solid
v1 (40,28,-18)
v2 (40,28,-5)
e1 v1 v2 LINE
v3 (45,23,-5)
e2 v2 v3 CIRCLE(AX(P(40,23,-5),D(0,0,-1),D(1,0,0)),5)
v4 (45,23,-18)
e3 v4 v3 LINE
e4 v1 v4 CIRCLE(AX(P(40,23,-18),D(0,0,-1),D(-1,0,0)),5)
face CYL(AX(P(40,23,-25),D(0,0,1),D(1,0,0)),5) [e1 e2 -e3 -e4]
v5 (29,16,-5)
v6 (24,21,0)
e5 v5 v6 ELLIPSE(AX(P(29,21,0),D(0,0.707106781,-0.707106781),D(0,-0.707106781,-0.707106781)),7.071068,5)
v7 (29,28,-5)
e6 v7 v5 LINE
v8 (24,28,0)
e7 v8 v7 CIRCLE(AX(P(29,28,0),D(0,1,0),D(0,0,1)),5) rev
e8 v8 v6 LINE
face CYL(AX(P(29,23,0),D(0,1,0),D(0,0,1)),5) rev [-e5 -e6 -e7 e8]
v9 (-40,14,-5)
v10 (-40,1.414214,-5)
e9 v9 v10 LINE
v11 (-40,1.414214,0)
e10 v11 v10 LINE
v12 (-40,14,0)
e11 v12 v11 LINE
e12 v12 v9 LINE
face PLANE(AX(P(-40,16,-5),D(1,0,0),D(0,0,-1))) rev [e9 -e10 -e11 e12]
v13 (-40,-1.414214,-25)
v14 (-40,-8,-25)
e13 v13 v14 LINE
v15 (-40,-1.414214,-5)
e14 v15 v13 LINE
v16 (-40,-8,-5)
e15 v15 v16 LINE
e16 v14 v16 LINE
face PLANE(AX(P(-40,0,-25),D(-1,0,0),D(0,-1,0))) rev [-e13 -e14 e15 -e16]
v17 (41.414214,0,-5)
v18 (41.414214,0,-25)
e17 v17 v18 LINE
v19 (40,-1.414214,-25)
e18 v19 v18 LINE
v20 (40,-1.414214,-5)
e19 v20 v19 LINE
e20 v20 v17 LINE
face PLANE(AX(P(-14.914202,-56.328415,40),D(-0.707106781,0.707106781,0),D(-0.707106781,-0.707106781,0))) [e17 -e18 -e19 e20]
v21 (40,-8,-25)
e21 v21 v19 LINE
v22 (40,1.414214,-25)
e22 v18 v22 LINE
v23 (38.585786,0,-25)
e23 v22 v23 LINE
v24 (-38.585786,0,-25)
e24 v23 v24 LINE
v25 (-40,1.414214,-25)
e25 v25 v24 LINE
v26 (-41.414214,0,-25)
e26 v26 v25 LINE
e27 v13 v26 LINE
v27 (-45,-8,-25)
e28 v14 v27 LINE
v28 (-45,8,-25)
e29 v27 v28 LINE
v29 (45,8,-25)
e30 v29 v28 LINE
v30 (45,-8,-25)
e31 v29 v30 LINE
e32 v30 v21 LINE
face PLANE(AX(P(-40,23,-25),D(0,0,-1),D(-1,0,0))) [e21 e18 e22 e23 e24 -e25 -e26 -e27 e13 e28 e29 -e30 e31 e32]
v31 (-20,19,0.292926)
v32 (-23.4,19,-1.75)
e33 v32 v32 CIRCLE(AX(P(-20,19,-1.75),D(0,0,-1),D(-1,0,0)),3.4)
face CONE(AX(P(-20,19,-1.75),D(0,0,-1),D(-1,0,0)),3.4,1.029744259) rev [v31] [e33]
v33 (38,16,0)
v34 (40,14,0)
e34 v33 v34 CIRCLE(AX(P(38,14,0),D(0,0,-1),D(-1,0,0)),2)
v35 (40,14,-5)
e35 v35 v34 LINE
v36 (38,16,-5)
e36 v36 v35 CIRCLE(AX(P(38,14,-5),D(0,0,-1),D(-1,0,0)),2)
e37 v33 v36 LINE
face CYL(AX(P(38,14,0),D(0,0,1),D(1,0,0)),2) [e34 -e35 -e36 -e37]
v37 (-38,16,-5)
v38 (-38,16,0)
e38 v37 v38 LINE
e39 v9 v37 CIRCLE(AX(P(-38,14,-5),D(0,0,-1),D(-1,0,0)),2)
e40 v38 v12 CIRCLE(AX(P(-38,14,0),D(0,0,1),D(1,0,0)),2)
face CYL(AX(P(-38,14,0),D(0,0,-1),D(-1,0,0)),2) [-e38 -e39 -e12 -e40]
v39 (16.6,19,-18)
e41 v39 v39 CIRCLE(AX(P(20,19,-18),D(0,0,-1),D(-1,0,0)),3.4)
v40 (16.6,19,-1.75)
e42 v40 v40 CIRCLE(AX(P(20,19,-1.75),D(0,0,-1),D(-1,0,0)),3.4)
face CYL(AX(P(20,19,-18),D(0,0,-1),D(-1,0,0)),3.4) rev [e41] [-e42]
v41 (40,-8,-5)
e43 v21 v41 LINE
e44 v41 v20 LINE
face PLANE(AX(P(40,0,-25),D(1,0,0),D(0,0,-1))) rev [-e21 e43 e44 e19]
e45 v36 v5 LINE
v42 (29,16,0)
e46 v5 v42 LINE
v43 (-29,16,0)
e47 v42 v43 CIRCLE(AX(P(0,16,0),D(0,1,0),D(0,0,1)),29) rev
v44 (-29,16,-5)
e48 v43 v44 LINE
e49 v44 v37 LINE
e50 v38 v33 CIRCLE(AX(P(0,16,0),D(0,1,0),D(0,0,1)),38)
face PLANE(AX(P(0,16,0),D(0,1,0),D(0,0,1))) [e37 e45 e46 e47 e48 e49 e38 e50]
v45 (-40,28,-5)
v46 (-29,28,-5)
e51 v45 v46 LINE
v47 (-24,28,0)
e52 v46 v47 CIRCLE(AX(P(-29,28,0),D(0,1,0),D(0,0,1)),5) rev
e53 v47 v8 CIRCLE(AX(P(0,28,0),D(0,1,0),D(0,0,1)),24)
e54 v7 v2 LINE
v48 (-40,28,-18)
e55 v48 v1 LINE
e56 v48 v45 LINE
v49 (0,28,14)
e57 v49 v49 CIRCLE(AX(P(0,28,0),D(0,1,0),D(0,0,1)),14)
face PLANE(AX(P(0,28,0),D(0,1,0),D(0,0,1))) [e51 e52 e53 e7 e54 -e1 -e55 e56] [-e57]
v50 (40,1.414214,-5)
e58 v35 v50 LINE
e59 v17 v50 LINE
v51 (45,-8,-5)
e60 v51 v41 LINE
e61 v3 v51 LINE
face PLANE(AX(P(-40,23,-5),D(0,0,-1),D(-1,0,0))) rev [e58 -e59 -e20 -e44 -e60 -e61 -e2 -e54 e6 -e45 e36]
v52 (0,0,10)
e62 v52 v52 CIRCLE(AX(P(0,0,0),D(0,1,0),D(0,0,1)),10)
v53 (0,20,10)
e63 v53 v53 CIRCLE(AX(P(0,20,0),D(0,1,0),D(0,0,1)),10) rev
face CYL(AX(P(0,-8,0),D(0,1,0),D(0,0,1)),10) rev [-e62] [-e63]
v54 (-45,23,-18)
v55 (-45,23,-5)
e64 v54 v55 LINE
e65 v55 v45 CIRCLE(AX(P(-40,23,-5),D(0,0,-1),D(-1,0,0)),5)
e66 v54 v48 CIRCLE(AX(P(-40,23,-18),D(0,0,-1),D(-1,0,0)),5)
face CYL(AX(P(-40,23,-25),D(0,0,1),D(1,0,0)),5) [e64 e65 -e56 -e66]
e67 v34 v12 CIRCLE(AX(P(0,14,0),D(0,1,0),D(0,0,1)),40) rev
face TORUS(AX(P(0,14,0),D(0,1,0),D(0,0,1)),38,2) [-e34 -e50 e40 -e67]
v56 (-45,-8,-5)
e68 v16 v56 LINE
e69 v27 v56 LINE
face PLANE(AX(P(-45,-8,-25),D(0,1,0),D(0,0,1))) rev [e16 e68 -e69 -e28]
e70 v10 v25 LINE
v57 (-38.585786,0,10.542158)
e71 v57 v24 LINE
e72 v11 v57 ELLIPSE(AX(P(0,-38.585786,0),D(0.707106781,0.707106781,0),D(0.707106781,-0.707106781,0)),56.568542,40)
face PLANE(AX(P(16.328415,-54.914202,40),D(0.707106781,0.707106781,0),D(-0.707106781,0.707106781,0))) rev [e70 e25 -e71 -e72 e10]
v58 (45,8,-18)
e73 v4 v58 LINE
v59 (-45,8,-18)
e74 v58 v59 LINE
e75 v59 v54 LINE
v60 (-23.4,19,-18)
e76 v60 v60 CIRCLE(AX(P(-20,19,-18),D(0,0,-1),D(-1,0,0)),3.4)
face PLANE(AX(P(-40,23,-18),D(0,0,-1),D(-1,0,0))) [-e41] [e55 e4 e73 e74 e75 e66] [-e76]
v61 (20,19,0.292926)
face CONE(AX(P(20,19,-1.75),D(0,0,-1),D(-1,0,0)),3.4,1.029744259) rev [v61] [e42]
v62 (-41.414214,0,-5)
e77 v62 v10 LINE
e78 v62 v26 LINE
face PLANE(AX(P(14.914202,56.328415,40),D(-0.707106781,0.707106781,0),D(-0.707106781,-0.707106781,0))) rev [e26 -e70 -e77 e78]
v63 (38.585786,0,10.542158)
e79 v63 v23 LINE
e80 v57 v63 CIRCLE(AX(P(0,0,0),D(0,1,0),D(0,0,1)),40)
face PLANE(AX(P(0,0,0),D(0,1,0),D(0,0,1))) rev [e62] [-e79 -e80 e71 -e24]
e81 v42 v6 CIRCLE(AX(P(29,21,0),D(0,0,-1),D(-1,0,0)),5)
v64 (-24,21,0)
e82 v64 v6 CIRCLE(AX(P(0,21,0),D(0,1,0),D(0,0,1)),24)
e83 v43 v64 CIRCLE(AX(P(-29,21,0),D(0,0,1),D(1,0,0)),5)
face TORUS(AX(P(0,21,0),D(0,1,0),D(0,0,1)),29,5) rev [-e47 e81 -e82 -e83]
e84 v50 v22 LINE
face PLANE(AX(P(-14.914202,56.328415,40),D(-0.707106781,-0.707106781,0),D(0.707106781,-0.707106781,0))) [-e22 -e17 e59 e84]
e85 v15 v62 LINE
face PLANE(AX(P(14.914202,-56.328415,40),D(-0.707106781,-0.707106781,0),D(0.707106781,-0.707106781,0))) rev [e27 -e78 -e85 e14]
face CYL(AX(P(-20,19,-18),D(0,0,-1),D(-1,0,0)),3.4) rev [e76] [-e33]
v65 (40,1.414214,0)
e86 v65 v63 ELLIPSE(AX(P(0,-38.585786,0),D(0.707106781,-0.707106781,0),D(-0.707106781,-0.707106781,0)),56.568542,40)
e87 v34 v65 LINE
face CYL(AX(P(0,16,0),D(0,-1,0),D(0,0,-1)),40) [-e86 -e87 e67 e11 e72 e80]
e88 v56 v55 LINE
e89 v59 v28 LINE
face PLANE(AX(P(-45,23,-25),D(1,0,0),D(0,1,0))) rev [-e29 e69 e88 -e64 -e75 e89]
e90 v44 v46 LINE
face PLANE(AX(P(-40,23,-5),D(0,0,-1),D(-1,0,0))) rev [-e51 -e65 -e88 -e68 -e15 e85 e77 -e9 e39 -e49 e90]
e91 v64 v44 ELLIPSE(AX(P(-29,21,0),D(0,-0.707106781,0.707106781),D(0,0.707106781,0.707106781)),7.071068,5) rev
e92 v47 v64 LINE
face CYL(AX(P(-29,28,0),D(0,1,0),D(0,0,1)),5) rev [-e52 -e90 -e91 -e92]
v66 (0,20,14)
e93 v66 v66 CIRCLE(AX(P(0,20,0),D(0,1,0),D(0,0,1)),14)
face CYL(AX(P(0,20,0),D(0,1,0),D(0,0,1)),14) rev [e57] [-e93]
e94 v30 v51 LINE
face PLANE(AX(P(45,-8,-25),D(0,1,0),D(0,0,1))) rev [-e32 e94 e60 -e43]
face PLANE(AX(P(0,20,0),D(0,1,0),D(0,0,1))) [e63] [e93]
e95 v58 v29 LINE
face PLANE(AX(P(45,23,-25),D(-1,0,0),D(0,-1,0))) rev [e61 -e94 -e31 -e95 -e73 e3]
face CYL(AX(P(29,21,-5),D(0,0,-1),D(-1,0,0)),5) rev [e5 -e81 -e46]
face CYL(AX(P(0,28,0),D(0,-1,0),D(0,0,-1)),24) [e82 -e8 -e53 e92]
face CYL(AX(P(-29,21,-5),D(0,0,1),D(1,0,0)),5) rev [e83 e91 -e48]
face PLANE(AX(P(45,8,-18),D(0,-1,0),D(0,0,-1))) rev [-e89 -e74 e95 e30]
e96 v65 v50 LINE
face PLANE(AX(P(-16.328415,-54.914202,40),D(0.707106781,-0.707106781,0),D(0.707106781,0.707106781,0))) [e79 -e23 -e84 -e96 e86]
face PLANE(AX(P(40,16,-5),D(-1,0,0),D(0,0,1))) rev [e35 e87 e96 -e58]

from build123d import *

# Parameters (mm, degrees)
EXTRUDE_1_DEPTH        = 16
EXTRUDE_2_DEPTH        = 12
EXTRUDE_3_DEPTH        = 20
CUT_EXTRUDE_START      = -7
CUT_EXTRUDE_1_DEPTH    = 7
SKETCH_6_R             = 10
CUT_EXTRUDE_2_DEPTH    = 71.149839629
SKETCH_7_R             = 14
CUT_EXTRUDE_3_DEPTH    = 8
HOLE_WIZARD_M8_1_D     = 6.8
HOLE_WIZARD_M8_1_DEPTH = 16.25
HOLE_WIZARD_M8_1_TIP   = 2.042926105
CUT_EXTRUDE_4_DEPTH    = 84.868945385
FILLET_3_R             = 2
FILLET_6_R             = 5


with BuildPart() as part:
    # 草图1 → 凸台-拉伸1 (new body)
    with BuildSketch(Plane(origin=(0, 0, 0), x_dir=(1, 0, 0), z_dir=(0, 1, 0))):
        with BuildLine():
            Line((40, 5), (-40, 5))
            Line((-40, 5), (-40, 0))
            ThreePointArc((-40, 0), (0, -40), (40, 0))
            Line((40, 0), (40, 5))
        make_face()
    extrude(amount=EXTRUDE_1_DEPTH)

    # 草图3 → 凸台-拉伸2 (add)
    with BuildSketch(Plane(origin=(0, 16, 0), x_dir=(1, 0, 0), z_dir=(0, 1, 0))):
        with BuildLine():
            Line((-24, 5), (-24, 0))
            ThreePointArc((-24, 0), (0, -24), (24, 0))
            Line((24, 0), (24, 5))
            Line((24, 5), (-24, 5))
        make_face()
    extrude(amount=EXTRUDE_2_DEPTH)

    # 草图4 → 凸台-拉伸3 (add)
    with BuildSketch(Plane(origin=(0, 0, -5), x_dir=(-1, 0, 0), z_dir=(0, 0, -1))):
        with BuildLine():
            Line((-45, 23), (-45, -8))
            Line((-45, -8), (-40, -8))
            Line((-40, -8), (-40, 0))
            Line((-40, 0), (40, 0))
            Line((40, 0), (40, -8))
            Line((40, -8), (45, -8))
            Line((45, -8), (45, 23))
            ThreePointArc((45, 23), (43.535533906, 26.535533906), (40, 28))
            Line((40, 28), (-40, 28))
            ThreePointArc((-40, 28), (-43.535533906, 26.535533906), (-45, 23))
        make_face()
    extrude(amount=EXTRUDE_3_DEPTH)

    # 草图5 → 切除-拉伸1 (cut)
    with BuildSketch(Plane(origin=(0, 0, -25), x_dir=(-1, 0, 0), z_dir=(0, 0, -1)).offset(CUT_EXTRUDE_START)):
        with BuildLine():
            Line((-45, 8), (45, 8))
            Line((45, 8), (45, 23))
            ThreePointArc((45, 23), (43.535533906, 26.535533906), (40, 28))
            Line((40, 28), (-40, 28))
            ThreePointArc((-40, 28), (-43.535533906, 26.535533906), (-45, 23))
            Line((-45, 23), (-45, 8))
        make_face()
    extrude(amount=CUT_EXTRUDE_1_DEPTH, mode=Mode.SUBTRACT)

    # 草图6 → 切除-拉伸2 (cut, through all)
    with BuildSketch(Plane(origin=(0, 28, 0), x_dir=(1, 0, 0), z_dir=(0, 1, 0))):
        with Locations(Location((0, 0, 0), (0, 0, 270))):
            Circle(SKETCH_6_R)
    extrude(amount=-CUT_EXTRUDE_2_DEPTH, mode=Mode.SUBTRACT)

    # 草图7 → 切除-拉伸3 (cut)
    with BuildSketch(Plane(origin=(0, 28, 0), x_dir=(1, 0, 0), z_dir=(0, 1, 0))):
        with Locations(Location((0, 0, 0), (0, 0, 270))):
            Circle(SKETCH_7_R)
    extrude(amount=-CUT_EXTRUDE_3_DEPTH, mode=Mode.SUBTRACT)

    # M8 螺纹孔1
    with Locations(Plane(origin=(0, 0, -18), x_dir=(-1, 0, 0), z_dir=(0, 0, -1))):
        with Locations((-20, 19), (20, 19)):
            Hole(HOLE_WIZARD_M8_1_D / 2, depth=HOLE_WIZARD_M8_1_DEPTH)
            with Locations((0, 0, -(HOLE_WIZARD_M8_1_DEPTH + HOLE_WIZARD_M8_1_TIP / 2))):  # 118° drill point
                Cone(0, HOLE_WIZARD_M8_1_D / 2, HOLE_WIZARD_M8_1_TIP, mode=Mode.SUBTRACT)

    # 草图12 → 切除-拉伸4 (cut, through all)
    with BuildSketch(Plane(origin=(0, 0, -25), x_dir=(-1, 0, 0), z_dir=(0, 0, -1))):
        Polygon((-38.585786438, 0), (-40, 1.414213562), (-41.414213562, 0), (-40, -1.414213562), (-40, 0), align=None)
    cut_extrude_4 = extrude(amount=-CUT_EXTRUDE_4_DEPTH, mode=Mode.SUBTRACT)

    # 镜向1: 切除-拉伸4 across plane
    add(cut_extrude_4.mirror(Plane(origin=(0, 0, 0), x_dir=(0, 0, 1), z_dir=(1, 0, 0))), mode=Mode.SUBTRACT)

    # 圆角3
    fillet_3_edges = [part.edges().sort_by_distance(p)[0] for p in [
        (40, 16, -2.5),
        (0, 16, 40),
        (-40, 16, -2.5),
    ]]
    fillet(fillet_3_edges, radius=FILLET_3_R)

    # 圆角6
    fillet_6_edges = [part.edges().sort_by_distance(p)[0] for p in [
        (-24, 16, -2.5),
        (24, 16, -2.5),
        (-24, 22, -5),
        (24, 22, -5),
        (0, 16, 24),
    ]]
    fillet(fillet_6_edges, radius=FILLET_6_R - 0.0001)  # a hair under: the kernel refuses the full size


solid = part.part
